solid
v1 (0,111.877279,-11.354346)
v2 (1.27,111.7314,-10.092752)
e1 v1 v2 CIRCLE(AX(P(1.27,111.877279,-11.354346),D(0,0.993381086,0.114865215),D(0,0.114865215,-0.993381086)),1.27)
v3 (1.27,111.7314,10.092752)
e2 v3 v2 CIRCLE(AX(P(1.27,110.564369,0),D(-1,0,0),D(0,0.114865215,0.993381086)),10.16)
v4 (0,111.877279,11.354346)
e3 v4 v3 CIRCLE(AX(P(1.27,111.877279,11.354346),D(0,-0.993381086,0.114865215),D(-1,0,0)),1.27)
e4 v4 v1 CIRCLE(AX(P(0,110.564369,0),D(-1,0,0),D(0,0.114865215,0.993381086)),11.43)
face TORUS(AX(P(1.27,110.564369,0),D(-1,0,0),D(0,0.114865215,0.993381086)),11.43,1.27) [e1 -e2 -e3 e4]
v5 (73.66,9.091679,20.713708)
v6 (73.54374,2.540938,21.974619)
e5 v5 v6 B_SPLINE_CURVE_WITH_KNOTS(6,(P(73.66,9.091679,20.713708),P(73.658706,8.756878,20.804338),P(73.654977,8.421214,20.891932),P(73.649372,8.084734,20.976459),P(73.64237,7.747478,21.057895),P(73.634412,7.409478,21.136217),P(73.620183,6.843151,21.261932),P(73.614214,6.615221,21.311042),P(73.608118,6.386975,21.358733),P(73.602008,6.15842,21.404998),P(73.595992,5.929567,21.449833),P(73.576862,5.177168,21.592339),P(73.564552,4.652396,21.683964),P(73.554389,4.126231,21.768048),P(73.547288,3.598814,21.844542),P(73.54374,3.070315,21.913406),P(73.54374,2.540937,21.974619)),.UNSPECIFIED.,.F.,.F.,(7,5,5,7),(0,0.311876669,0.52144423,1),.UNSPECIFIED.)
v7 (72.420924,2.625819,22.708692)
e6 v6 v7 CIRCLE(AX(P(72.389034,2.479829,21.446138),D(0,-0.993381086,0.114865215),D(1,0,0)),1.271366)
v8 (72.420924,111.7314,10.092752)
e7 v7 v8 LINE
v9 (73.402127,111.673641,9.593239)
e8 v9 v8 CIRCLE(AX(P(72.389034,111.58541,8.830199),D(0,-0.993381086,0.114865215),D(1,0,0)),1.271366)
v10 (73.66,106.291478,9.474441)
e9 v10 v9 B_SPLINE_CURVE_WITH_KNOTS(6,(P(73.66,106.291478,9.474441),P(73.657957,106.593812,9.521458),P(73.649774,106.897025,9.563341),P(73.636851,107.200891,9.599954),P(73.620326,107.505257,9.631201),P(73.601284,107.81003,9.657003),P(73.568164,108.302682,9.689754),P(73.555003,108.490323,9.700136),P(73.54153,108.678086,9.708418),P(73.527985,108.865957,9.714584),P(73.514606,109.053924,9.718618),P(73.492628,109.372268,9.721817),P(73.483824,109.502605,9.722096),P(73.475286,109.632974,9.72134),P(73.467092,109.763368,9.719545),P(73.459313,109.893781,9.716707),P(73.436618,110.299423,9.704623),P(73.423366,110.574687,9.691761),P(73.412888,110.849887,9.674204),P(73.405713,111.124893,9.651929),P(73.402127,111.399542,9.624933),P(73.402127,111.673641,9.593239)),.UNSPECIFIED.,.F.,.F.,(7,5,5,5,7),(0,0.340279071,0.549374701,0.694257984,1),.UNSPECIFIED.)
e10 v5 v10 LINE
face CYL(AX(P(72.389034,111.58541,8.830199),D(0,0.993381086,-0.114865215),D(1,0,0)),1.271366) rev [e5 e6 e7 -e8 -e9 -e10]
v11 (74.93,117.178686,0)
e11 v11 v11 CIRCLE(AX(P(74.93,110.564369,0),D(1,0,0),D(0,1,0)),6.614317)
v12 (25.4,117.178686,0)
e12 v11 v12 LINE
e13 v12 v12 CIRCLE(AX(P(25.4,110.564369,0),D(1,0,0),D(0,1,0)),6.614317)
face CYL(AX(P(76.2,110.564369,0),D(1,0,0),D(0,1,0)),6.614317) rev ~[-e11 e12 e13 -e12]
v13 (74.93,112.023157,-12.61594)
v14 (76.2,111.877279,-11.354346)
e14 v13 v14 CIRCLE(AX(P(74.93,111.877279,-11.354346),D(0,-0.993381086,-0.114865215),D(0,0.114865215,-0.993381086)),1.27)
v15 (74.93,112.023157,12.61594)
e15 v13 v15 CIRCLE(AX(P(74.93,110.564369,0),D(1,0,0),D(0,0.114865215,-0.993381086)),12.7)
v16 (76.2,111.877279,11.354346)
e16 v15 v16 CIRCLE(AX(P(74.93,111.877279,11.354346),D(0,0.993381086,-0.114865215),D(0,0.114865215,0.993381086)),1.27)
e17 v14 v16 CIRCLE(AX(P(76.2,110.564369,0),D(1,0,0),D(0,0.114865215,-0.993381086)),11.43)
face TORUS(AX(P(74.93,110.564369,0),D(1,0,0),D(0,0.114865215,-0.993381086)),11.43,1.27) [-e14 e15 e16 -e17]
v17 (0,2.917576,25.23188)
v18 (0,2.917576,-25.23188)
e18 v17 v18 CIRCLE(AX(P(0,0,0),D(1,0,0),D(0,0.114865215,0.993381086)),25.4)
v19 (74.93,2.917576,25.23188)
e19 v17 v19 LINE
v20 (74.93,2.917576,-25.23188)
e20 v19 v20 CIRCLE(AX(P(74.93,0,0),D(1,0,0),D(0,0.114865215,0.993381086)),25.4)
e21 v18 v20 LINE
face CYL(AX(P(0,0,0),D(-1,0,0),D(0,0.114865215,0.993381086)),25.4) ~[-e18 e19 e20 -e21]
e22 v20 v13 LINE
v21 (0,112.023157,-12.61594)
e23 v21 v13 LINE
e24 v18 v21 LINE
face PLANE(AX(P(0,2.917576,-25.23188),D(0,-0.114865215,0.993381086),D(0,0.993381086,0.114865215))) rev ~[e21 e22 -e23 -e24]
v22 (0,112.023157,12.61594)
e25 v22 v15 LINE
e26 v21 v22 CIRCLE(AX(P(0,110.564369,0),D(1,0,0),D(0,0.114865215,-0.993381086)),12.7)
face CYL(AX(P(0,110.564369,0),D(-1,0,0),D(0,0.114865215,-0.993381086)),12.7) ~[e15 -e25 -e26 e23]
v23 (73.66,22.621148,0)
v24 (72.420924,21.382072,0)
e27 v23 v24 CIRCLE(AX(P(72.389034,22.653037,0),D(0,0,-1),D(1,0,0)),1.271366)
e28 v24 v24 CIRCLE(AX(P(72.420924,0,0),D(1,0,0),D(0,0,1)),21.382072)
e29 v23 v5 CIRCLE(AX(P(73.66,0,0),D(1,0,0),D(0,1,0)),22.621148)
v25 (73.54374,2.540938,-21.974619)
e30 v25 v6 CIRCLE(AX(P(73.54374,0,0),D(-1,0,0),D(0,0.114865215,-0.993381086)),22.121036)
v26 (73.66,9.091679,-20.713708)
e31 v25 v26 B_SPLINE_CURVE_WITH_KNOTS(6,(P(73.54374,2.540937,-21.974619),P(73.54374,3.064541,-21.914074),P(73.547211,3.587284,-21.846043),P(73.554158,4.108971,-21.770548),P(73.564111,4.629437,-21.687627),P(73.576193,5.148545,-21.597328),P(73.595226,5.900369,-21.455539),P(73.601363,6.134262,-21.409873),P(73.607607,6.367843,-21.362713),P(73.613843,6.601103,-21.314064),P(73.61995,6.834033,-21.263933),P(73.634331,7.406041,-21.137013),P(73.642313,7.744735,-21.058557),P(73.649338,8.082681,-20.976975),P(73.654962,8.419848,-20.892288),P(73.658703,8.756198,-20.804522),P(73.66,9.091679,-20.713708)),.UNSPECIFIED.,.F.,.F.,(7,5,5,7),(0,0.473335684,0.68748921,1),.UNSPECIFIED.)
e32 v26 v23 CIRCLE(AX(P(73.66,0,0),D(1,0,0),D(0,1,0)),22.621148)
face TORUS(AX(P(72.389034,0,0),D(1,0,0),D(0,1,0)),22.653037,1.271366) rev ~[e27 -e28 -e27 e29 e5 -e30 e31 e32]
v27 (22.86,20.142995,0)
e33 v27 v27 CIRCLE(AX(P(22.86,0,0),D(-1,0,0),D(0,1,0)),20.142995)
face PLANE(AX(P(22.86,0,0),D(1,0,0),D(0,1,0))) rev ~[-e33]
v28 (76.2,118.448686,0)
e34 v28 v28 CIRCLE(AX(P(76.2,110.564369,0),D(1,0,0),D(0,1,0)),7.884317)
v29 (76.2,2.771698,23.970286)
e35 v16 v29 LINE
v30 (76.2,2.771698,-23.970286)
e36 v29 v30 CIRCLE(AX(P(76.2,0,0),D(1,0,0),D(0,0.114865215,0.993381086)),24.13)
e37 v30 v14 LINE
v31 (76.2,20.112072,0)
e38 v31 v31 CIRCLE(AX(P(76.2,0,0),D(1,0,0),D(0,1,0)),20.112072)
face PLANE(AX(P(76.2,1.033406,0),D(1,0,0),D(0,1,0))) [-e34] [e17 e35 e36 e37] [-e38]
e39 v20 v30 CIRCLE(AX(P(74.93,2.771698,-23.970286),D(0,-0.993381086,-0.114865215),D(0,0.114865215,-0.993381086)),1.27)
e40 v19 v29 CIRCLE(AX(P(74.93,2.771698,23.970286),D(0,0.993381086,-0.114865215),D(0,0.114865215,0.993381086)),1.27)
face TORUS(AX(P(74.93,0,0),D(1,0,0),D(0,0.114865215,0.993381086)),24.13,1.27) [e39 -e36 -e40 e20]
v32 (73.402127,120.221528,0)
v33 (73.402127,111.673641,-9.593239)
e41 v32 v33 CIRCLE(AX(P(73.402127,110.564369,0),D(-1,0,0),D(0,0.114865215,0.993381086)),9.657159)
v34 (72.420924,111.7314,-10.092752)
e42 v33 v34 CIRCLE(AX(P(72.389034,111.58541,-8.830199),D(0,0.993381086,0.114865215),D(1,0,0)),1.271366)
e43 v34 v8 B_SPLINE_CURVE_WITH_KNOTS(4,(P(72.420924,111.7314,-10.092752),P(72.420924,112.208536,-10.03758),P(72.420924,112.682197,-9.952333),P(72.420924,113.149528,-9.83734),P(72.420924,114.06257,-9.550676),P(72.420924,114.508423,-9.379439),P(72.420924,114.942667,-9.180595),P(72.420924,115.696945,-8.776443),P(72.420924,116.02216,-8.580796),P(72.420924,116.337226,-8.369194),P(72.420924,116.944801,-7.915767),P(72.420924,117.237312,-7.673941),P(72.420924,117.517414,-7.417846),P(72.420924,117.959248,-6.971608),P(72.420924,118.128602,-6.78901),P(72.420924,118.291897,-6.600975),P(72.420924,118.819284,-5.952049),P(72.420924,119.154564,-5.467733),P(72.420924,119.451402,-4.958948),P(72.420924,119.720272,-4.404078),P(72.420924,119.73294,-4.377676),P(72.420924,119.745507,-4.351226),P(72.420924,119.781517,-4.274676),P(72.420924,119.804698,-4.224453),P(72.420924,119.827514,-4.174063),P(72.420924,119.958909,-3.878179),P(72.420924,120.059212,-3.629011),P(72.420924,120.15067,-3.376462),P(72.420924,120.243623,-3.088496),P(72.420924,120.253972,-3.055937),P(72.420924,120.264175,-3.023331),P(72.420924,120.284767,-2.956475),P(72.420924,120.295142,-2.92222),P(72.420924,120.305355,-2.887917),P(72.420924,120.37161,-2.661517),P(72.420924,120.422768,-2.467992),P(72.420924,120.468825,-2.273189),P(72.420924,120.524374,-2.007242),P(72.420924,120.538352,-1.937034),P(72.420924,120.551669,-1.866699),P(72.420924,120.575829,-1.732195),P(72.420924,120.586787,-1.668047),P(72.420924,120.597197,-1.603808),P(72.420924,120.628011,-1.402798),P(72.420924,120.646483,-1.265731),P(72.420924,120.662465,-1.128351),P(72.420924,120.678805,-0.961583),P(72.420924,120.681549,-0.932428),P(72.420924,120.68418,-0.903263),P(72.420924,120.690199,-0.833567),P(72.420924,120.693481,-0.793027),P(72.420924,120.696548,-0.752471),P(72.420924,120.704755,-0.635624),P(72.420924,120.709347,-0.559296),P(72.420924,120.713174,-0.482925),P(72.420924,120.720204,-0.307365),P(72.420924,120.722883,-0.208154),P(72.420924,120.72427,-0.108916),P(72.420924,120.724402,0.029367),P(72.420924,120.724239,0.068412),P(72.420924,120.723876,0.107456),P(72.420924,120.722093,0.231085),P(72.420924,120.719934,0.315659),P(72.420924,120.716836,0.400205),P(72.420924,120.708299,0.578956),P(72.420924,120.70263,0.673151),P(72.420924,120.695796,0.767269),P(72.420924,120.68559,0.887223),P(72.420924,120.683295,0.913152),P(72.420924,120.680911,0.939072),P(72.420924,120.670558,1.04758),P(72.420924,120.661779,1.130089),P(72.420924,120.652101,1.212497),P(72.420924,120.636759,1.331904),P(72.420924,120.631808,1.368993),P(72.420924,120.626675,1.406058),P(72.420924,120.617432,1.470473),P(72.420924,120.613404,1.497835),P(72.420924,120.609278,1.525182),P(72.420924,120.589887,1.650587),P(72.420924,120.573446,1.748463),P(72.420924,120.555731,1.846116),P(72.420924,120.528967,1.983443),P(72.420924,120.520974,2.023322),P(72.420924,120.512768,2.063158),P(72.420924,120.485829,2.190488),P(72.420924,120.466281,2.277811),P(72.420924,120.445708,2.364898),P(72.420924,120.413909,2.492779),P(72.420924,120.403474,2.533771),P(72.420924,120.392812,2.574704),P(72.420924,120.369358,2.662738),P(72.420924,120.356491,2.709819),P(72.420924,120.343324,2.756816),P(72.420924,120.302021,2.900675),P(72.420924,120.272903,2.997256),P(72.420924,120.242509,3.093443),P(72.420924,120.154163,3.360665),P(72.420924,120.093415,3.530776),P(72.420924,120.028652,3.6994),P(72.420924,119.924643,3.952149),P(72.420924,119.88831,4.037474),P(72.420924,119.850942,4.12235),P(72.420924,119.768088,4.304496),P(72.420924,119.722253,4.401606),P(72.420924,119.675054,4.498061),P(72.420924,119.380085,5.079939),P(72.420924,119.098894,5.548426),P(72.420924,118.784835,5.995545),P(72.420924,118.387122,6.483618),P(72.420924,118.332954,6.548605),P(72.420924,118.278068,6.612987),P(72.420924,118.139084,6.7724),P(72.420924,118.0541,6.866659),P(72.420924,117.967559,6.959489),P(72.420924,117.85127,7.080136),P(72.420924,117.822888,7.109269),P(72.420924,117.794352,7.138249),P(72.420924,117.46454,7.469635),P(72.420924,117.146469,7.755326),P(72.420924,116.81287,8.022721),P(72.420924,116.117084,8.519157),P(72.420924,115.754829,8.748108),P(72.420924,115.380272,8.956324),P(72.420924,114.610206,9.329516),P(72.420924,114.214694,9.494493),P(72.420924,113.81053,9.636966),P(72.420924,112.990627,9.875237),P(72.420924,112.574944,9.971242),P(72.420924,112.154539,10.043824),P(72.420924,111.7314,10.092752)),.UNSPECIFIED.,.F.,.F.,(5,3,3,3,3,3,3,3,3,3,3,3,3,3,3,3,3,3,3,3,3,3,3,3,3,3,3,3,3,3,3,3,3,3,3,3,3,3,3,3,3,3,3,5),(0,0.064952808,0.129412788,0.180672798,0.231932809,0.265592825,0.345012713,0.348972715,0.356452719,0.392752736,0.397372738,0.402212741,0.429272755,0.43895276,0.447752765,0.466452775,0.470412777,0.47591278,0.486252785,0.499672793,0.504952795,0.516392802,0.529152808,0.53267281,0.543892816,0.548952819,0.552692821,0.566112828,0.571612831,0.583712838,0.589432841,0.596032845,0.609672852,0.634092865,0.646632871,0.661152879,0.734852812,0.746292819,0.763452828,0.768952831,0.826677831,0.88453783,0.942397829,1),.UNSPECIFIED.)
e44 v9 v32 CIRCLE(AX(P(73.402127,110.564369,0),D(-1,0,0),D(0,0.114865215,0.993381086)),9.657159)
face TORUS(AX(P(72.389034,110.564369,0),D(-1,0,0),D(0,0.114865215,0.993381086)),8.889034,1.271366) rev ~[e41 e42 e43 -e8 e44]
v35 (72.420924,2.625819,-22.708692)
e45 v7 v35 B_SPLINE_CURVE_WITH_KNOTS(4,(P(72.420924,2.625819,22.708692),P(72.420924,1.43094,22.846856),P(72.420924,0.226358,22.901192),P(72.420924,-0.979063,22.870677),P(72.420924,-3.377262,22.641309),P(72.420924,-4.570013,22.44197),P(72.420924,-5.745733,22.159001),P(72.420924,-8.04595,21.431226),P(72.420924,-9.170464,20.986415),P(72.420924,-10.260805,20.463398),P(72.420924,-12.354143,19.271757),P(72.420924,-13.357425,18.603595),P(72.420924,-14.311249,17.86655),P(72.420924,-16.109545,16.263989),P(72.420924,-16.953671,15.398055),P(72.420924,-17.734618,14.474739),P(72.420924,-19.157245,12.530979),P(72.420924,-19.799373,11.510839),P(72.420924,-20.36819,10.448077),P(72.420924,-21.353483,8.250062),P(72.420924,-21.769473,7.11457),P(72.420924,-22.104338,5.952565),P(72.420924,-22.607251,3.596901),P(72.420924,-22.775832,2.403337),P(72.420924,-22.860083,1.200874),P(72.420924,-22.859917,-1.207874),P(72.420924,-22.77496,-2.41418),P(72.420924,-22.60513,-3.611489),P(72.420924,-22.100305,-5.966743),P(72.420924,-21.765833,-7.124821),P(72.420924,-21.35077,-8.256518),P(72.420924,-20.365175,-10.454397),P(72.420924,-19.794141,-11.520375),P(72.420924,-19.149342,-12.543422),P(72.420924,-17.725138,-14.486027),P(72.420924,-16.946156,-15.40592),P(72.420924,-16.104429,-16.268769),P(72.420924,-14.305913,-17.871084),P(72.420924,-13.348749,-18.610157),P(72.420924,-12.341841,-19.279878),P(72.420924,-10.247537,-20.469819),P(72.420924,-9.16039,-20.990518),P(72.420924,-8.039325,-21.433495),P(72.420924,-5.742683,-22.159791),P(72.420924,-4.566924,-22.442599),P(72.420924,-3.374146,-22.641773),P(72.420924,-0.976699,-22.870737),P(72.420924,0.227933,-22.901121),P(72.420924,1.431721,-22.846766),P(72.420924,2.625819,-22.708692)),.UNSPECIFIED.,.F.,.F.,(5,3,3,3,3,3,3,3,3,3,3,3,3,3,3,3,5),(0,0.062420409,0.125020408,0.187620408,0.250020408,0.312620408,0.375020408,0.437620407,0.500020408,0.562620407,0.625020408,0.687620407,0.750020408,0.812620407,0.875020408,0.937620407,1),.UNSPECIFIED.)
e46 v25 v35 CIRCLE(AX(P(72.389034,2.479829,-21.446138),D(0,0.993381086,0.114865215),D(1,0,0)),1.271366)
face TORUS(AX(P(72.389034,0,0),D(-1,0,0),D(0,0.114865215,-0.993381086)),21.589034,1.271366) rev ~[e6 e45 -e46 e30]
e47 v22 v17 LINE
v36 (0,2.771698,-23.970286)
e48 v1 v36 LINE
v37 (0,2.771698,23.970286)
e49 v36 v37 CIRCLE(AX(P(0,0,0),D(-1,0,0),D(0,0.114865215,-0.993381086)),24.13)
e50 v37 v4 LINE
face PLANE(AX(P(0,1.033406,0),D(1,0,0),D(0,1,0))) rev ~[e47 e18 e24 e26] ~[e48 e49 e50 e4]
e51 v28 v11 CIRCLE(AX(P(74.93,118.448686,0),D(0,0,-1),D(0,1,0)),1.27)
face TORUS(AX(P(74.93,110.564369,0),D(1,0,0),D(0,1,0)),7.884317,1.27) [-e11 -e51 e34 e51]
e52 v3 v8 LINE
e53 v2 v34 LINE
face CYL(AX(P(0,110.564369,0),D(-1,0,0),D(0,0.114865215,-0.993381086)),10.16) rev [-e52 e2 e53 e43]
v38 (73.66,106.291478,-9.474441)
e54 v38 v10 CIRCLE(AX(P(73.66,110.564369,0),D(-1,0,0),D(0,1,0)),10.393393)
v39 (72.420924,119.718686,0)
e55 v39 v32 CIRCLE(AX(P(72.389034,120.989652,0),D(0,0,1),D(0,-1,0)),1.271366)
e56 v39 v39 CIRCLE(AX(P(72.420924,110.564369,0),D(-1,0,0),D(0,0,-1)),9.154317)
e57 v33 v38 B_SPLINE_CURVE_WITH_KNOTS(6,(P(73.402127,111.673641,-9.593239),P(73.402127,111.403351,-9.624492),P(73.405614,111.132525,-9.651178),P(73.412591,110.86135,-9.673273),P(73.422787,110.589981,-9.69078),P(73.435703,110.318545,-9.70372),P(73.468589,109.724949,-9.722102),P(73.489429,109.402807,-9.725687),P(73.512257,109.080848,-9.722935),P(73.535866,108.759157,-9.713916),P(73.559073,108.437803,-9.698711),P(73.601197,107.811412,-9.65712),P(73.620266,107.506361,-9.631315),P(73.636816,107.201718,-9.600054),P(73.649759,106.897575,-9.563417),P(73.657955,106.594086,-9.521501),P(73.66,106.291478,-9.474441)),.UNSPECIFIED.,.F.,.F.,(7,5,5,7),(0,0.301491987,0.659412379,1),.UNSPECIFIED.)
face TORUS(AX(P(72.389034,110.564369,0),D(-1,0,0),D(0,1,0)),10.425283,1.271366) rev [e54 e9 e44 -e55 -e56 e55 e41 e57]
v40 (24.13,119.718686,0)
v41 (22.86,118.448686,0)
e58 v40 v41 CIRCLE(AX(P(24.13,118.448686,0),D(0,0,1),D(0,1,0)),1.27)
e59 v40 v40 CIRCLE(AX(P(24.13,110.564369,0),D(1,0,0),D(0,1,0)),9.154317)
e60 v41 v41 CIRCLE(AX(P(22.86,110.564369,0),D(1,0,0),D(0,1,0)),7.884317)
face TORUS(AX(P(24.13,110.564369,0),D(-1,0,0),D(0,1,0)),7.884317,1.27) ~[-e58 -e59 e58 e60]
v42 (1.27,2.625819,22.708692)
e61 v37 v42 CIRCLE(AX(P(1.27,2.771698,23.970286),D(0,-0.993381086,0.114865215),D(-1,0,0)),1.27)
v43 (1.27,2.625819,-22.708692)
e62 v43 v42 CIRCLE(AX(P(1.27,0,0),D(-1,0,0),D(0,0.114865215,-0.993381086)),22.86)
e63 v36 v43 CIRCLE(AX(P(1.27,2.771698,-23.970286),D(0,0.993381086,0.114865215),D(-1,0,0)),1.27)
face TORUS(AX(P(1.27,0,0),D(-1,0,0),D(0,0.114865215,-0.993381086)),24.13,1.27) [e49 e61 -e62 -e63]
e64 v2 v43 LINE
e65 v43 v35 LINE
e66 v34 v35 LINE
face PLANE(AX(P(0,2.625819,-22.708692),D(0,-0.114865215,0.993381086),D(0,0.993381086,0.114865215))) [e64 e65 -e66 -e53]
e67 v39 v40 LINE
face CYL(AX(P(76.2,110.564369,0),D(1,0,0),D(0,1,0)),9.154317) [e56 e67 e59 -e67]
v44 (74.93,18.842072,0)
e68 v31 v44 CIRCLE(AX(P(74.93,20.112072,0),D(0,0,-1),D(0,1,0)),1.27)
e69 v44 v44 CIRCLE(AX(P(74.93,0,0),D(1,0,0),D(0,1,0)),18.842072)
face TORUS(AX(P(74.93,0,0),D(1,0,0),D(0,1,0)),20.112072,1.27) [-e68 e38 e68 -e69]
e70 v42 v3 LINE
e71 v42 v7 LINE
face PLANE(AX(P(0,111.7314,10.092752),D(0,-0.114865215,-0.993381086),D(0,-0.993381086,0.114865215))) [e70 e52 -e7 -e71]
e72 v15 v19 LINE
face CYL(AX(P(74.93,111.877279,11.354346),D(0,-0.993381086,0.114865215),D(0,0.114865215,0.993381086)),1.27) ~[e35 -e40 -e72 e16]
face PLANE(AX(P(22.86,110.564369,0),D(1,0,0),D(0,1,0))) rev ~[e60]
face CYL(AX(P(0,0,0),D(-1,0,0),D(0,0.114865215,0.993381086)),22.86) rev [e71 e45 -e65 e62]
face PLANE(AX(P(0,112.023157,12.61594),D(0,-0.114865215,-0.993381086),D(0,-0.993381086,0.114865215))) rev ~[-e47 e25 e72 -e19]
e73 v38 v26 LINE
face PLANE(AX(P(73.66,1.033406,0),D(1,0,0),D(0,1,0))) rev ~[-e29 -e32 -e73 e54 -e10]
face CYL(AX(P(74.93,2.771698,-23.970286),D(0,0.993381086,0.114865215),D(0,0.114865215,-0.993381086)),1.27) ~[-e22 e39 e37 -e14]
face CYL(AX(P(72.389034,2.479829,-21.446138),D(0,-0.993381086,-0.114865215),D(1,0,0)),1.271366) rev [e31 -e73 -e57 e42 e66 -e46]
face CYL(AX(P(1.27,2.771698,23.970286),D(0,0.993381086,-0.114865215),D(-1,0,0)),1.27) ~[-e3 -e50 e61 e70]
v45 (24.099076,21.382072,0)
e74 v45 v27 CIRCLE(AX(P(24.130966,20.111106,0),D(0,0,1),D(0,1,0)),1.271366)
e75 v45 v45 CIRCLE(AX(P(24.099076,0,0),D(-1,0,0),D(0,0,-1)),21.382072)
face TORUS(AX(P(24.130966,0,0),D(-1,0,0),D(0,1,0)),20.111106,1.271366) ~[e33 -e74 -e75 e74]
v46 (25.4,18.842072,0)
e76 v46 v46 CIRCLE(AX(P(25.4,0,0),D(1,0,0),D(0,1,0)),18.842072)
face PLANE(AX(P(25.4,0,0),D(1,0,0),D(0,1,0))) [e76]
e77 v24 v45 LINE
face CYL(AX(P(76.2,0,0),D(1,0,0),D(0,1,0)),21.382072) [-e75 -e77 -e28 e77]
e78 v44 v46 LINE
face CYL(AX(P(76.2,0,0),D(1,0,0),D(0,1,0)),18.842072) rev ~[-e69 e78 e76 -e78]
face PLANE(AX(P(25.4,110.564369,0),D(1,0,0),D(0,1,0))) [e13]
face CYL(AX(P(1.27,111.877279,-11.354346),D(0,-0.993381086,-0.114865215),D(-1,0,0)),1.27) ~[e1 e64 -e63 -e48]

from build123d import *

# Parameters (mm, degrees)
F1_DEPTH    = 76.2
F2_R        = 18.8420717169
F2_R_2      = 6.614317189
F3_DEPTH    = 50.8
F4_R        = 1.27
F5_T        = -2.54
F6_R        = 1.27
F7_R        = 1.27
F8_T1_DEPTH = 109.83255313
F8_T3_DEPTH = 109.83255313
F8_T6_ANGLE = 193.1917018044
F8_T8_ANGLE = 166.8082981956


# Not quite as in the source:
# - a fillet or chamfer that OpenCascade refuses, or shapes differently, is made with other operations: its cross-section is extruded or revolved along the edge and cut away or added


with BuildPart() as f1:
    # F0 (on Right) → F1 (new body)
    with BuildSketch(Plane.YZ):
        with BuildLine():
            ThreePointArc((2.9175764531, -25.2318795899), (18.9639980214, -16.8975376622), (25.4, 0))
            ThreePointArc((25.4, 0), (18.9639980214, 16.8975376622), (2.9175764531, 25.2318795899))
            ThreePointArc((2.9175764531, 25.2318795899), (-25.4, 0), (2.9175764531, -25.2318795899))
        make_face()
        with BuildLine():
            ThreePointArc((2.9175764531, 25.2318795899), (18.9639980214, 16.8975376622), (25.4, 0))
            ThreePointArc((25.4, 0), (18.9639980214, -16.8975376622), (2.9175764531, -25.2318795899))
            Line((2.9175764531, -25.2318795899), (112.0231573834, -12.615939795))
            ThreePointArc((112.0231573834, -12.615939795), (97.8643691568, 0), (112.0231573834, 12.615939795))
            Line((112.0231573834, 12.615939795), (2.9175764531, 25.2318795899))
        make_face()
        with BuildLine():
            ThreePointArc((123.2643691568, 0), (120.0463681675, 8.4487688311), (112.0231573834, 12.615939795))
            ThreePointArc((112.0231573834, 12.615939795), (97.8643691568, 0), (112.0231573834, -12.615939795))
            ThreePointArc((112.0231573834, -12.615939795), (120.0463681675, -8.4487688311), (123.2643691568, 0))
        make_face()
    extrude(amount=F1_DEPTH)

    # F2 (on face) → F3 (cut)
    with BuildSketch(Plane.YZ.offset(76.2)):
        Circle(F2_R)
        with Locations((110.5643691568, 0)):
            Circle(F2_R_2)
    extrude(amount=-F3_DEPTH, mode=Mode.SUBTRACT)

    # F4
    f4_edges = [f1.edges().sort_by_distance(p)[0] for p in [
        (76.2, -25.4, 0),
        (76.2, -18.842072, 0),
        (76.2, 103.950052, 0),
    ]]
    fillet(f4_edges, radius=F4_R)

    # F5
    f5_openings = [f1.faces().sort_by_distance(p)[0] for p in [
        (0, 41.190911, 0),
    ]]
    offset(amount=F5_T, openings=f5_openings, kind=Kind.INTERSECTION)

    # F6
    f6_edges = [f1.edges().sort_by_distance(p)[0] for p in [
        (0, 57.178609, 16.400722),
    ]]
    fillet(f6_edges, radius=F6_R)

    # F7
    f7_edges = [f1.edges().sort_by_distance(p)[0] for p in [
        (22.86, 101.410052, 0),
        (48.26, 119.718686, 0),
    ]]
    fillet(f7_edges, radius=F7_R)

    # F8: fillet of radius 1.27 on 8 edges, made by hand

    # F8_s2 → F8_t1 (join)
    with BuildSketch(Plane(origin=(0, 109.1055809303, -12.615939795), x_dir=(1, 0, 0), z_dir=(0, -0.9933810862, 0.1148652147))):
        with BuildLine():
            ThreePointArc((73.6604, 21.5890343146), (73.2880256121, 22.4880256121), (72.3890343146, 22.8604))
            Line((72.3890343146, 22.8604), (72.3890343146, 22.9875365685))
            ThreePointArc((72.3890343146, 22.9875365685), (73.0245171573, 22.9871365685), (73.66, 22.9871365685))
            Line((73.66, 22.9871365685), (73.7871365685, 22.86))
            ThreePointArc((73.7871365685, 22.86), (73.7871365685, 22.2245171573), (73.7875365685, 21.5890343146))
            Line((73.7875365685, 21.5890343146), (73.6604, 21.5890343146))
        make_face()
    extrude(amount=F8_T1_DEPTH)

    # F8_s4 → F8_t3 (join)
    with BuildSketch(Plane(origin=(0, 0, 0), x_dir=(1, 0, 0), z_dir=(0, 0.9933810862, 0.1148652147))):
        with BuildLine():
            ThreePointArc((73.6604, 21.5890343146), (73.2880256121, 22.4880256121), (72.3890343146, 22.8604))
            Line((72.3890343146, 22.8604), (72.3890343146, 22.9875365685))
            ThreePointArc((72.3890343146, 22.9875365685), (73.0245171573, 22.9871365685), (73.66, 22.9871365685))
            Line((73.66, 22.9871365685), (73.7871365685, 22.86))
            ThreePointArc((73.7871365685, 22.86), (73.7871365685, 22.2245171573), (73.7875365685, 21.5890343146))
            Line((73.7875365685, 21.5890343146), (73.6604, 21.5890343146))
        make_face()
    extrude(amount=F8_T3_DEPTH)

    # F8_s5 → F8_t6 (revolve)
    with BuildSketch(Plane(origin=(0, 0, 0), x_dir=(1, 0, 0), z_dir=(0, 0.9933810862, 0.1148652147))):
        with BuildLine():
            ThreePointArc((73.6604, 21.5890343146), (73.2880256121, 22.4880256121), (72.3890343146, 22.8604))
            Line((72.3890343146, 22.8604), (72.3890343146, 22.9875365685))
            ThreePointArc((72.3890343146, 22.9875365685), (73.0245171573, 22.9871365685), (73.66, 22.9871365685))
            Line((73.66, 22.9871365685), (73.7871365685, 22.86))
            ThreePointArc((73.7871365685, 22.86), (73.7871365685, 22.2245171573), (73.7875365685, 21.5890343146))
            Line((73.7875365685, 21.5890343146), (73.6604, 21.5890343146))
        make_face()
    revolve(axis=Axis((73.66, 0, 0), (-1, 0, 0)), revolution_arc=F8_T6_ANGLE)

    # F8_s7 → F8_t8 (revolve)
    with BuildSketch(Plane(origin=(0, 109.1055809303, -12.615939795), x_dir=(1, 0, 0), z_dir=(0, -0.9933810862, 0.1148652147))):
        with BuildLine():
            ThreePointArc((73.6604, 21.5890343146), (73.2880256121, 22.4880256121), (72.3890343146, 22.8604))
            Line((72.3890343146, 22.8604), (72.3890343146, 22.9875365685))
            ThreePointArc((72.3890343146, 22.9875365685), (73.0245171573, 22.9871365685), (73.66, 22.9871365685))
            Line((73.66, 22.9871365685), (73.7871365685, 22.86))
            ThreePointArc((73.7871365685, 22.86), (73.7871365685, 22.2245171573), (73.7875365685, 21.5890343146))
            Line((73.7875365685, 21.5890343146), (73.6604, 21.5890343146))
        make_face()
    revolve(axis=Axis((73.66, 110.5643691568, 0), (-1, 0, 0)), revolution_arc=F8_T8_ANGLE)

    # F8_s9 → F8_t10 (revolve)
    with BuildSketch(Plane.XY):
        with BuildLine():
            ThreePointArc((72.3890343146, 119.7182863458), (73.2880256121, 120.0906607337), (73.6604, 120.9896520312))
            Line((73.6604, 120.9896520312), (73.7875365685, 120.9896520312))
            ThreePointArc((73.7875365685, 120.9896520312), (73.7871365685, 120.3541691885), (73.7871365685, 119.7186863458))
            Line((73.7871365685, 119.7186863458), (73.66, 119.5915497773))
            ThreePointArc((73.66, 119.5915497773), (73.0245171573, 119.5915497773), (72.3890343146, 119.5911497773))
            Line((72.3890343146, 119.5911497773), (72.3890343146, 119.7182863458))
        make_face()
    revolve(axis=Axis((73.66, 110.5643691568, 0), (1, 0, 0)))

    # F8_s11 → F8_t12 (revolve)
    with BuildSketch(Plane.XY):
        with BuildLine():
            ThreePointArc((73.6604, 22.6530374023), (73.2880256121, 21.7540461048), (72.3890343146, 21.3816717169))
            Line((72.3890343146, 21.3816717169), (72.3890343146, 21.2545351484))
            ThreePointArc((72.3890343146, 21.2545351484), (73.0245171573, 21.2549351484), (73.66, 21.2549351484))
            Line((73.66, 21.2549351484), (73.7871365685, 21.3820717169))
            ThreePointArc((73.7871365685, 21.3820717169), (73.7871365685, 22.0175545596), (73.7875365685, 22.6530374023))
            Line((73.7875365685, 22.6530374023), (73.6604, 22.6530374023))
        make_face()
    revolve(axis=Axis((73.66, 0, 0), (1, 0, 0)))

    # F8_s13 → F8_t14 (revolve, cut)
    with BuildSketch(Plane.XY):
        with BuildLine():
            ThreePointArc((24.1309656854, 21.3824717169), (23.2319743879, 21.010097329), (22.8596, 20.1111060315))
            Line((22.8596, 20.1111060315), (22.7324634315, 20.1111060315))
            ThreePointArc((22.7324634315, 20.1111060315), (22.7328634315, 20.7465888742), (22.7328634315, 21.3820717169))
            Line((22.7328634315, 21.3820717169), (22.86, 21.5092082855))
            ThreePointArc((22.86, 21.5092082855), (23.4954828427, 21.5092082855), (24.1309656854, 21.5096082855))
            Line((24.1309656854, 21.5096082855), (24.1309656854, 21.3824717169))
        make_face()
    revolve(axis=Axis((22.86, 0, 0), (1, 0, 0)), mode=Mode.SUBTRACT)


solid = f1.part
